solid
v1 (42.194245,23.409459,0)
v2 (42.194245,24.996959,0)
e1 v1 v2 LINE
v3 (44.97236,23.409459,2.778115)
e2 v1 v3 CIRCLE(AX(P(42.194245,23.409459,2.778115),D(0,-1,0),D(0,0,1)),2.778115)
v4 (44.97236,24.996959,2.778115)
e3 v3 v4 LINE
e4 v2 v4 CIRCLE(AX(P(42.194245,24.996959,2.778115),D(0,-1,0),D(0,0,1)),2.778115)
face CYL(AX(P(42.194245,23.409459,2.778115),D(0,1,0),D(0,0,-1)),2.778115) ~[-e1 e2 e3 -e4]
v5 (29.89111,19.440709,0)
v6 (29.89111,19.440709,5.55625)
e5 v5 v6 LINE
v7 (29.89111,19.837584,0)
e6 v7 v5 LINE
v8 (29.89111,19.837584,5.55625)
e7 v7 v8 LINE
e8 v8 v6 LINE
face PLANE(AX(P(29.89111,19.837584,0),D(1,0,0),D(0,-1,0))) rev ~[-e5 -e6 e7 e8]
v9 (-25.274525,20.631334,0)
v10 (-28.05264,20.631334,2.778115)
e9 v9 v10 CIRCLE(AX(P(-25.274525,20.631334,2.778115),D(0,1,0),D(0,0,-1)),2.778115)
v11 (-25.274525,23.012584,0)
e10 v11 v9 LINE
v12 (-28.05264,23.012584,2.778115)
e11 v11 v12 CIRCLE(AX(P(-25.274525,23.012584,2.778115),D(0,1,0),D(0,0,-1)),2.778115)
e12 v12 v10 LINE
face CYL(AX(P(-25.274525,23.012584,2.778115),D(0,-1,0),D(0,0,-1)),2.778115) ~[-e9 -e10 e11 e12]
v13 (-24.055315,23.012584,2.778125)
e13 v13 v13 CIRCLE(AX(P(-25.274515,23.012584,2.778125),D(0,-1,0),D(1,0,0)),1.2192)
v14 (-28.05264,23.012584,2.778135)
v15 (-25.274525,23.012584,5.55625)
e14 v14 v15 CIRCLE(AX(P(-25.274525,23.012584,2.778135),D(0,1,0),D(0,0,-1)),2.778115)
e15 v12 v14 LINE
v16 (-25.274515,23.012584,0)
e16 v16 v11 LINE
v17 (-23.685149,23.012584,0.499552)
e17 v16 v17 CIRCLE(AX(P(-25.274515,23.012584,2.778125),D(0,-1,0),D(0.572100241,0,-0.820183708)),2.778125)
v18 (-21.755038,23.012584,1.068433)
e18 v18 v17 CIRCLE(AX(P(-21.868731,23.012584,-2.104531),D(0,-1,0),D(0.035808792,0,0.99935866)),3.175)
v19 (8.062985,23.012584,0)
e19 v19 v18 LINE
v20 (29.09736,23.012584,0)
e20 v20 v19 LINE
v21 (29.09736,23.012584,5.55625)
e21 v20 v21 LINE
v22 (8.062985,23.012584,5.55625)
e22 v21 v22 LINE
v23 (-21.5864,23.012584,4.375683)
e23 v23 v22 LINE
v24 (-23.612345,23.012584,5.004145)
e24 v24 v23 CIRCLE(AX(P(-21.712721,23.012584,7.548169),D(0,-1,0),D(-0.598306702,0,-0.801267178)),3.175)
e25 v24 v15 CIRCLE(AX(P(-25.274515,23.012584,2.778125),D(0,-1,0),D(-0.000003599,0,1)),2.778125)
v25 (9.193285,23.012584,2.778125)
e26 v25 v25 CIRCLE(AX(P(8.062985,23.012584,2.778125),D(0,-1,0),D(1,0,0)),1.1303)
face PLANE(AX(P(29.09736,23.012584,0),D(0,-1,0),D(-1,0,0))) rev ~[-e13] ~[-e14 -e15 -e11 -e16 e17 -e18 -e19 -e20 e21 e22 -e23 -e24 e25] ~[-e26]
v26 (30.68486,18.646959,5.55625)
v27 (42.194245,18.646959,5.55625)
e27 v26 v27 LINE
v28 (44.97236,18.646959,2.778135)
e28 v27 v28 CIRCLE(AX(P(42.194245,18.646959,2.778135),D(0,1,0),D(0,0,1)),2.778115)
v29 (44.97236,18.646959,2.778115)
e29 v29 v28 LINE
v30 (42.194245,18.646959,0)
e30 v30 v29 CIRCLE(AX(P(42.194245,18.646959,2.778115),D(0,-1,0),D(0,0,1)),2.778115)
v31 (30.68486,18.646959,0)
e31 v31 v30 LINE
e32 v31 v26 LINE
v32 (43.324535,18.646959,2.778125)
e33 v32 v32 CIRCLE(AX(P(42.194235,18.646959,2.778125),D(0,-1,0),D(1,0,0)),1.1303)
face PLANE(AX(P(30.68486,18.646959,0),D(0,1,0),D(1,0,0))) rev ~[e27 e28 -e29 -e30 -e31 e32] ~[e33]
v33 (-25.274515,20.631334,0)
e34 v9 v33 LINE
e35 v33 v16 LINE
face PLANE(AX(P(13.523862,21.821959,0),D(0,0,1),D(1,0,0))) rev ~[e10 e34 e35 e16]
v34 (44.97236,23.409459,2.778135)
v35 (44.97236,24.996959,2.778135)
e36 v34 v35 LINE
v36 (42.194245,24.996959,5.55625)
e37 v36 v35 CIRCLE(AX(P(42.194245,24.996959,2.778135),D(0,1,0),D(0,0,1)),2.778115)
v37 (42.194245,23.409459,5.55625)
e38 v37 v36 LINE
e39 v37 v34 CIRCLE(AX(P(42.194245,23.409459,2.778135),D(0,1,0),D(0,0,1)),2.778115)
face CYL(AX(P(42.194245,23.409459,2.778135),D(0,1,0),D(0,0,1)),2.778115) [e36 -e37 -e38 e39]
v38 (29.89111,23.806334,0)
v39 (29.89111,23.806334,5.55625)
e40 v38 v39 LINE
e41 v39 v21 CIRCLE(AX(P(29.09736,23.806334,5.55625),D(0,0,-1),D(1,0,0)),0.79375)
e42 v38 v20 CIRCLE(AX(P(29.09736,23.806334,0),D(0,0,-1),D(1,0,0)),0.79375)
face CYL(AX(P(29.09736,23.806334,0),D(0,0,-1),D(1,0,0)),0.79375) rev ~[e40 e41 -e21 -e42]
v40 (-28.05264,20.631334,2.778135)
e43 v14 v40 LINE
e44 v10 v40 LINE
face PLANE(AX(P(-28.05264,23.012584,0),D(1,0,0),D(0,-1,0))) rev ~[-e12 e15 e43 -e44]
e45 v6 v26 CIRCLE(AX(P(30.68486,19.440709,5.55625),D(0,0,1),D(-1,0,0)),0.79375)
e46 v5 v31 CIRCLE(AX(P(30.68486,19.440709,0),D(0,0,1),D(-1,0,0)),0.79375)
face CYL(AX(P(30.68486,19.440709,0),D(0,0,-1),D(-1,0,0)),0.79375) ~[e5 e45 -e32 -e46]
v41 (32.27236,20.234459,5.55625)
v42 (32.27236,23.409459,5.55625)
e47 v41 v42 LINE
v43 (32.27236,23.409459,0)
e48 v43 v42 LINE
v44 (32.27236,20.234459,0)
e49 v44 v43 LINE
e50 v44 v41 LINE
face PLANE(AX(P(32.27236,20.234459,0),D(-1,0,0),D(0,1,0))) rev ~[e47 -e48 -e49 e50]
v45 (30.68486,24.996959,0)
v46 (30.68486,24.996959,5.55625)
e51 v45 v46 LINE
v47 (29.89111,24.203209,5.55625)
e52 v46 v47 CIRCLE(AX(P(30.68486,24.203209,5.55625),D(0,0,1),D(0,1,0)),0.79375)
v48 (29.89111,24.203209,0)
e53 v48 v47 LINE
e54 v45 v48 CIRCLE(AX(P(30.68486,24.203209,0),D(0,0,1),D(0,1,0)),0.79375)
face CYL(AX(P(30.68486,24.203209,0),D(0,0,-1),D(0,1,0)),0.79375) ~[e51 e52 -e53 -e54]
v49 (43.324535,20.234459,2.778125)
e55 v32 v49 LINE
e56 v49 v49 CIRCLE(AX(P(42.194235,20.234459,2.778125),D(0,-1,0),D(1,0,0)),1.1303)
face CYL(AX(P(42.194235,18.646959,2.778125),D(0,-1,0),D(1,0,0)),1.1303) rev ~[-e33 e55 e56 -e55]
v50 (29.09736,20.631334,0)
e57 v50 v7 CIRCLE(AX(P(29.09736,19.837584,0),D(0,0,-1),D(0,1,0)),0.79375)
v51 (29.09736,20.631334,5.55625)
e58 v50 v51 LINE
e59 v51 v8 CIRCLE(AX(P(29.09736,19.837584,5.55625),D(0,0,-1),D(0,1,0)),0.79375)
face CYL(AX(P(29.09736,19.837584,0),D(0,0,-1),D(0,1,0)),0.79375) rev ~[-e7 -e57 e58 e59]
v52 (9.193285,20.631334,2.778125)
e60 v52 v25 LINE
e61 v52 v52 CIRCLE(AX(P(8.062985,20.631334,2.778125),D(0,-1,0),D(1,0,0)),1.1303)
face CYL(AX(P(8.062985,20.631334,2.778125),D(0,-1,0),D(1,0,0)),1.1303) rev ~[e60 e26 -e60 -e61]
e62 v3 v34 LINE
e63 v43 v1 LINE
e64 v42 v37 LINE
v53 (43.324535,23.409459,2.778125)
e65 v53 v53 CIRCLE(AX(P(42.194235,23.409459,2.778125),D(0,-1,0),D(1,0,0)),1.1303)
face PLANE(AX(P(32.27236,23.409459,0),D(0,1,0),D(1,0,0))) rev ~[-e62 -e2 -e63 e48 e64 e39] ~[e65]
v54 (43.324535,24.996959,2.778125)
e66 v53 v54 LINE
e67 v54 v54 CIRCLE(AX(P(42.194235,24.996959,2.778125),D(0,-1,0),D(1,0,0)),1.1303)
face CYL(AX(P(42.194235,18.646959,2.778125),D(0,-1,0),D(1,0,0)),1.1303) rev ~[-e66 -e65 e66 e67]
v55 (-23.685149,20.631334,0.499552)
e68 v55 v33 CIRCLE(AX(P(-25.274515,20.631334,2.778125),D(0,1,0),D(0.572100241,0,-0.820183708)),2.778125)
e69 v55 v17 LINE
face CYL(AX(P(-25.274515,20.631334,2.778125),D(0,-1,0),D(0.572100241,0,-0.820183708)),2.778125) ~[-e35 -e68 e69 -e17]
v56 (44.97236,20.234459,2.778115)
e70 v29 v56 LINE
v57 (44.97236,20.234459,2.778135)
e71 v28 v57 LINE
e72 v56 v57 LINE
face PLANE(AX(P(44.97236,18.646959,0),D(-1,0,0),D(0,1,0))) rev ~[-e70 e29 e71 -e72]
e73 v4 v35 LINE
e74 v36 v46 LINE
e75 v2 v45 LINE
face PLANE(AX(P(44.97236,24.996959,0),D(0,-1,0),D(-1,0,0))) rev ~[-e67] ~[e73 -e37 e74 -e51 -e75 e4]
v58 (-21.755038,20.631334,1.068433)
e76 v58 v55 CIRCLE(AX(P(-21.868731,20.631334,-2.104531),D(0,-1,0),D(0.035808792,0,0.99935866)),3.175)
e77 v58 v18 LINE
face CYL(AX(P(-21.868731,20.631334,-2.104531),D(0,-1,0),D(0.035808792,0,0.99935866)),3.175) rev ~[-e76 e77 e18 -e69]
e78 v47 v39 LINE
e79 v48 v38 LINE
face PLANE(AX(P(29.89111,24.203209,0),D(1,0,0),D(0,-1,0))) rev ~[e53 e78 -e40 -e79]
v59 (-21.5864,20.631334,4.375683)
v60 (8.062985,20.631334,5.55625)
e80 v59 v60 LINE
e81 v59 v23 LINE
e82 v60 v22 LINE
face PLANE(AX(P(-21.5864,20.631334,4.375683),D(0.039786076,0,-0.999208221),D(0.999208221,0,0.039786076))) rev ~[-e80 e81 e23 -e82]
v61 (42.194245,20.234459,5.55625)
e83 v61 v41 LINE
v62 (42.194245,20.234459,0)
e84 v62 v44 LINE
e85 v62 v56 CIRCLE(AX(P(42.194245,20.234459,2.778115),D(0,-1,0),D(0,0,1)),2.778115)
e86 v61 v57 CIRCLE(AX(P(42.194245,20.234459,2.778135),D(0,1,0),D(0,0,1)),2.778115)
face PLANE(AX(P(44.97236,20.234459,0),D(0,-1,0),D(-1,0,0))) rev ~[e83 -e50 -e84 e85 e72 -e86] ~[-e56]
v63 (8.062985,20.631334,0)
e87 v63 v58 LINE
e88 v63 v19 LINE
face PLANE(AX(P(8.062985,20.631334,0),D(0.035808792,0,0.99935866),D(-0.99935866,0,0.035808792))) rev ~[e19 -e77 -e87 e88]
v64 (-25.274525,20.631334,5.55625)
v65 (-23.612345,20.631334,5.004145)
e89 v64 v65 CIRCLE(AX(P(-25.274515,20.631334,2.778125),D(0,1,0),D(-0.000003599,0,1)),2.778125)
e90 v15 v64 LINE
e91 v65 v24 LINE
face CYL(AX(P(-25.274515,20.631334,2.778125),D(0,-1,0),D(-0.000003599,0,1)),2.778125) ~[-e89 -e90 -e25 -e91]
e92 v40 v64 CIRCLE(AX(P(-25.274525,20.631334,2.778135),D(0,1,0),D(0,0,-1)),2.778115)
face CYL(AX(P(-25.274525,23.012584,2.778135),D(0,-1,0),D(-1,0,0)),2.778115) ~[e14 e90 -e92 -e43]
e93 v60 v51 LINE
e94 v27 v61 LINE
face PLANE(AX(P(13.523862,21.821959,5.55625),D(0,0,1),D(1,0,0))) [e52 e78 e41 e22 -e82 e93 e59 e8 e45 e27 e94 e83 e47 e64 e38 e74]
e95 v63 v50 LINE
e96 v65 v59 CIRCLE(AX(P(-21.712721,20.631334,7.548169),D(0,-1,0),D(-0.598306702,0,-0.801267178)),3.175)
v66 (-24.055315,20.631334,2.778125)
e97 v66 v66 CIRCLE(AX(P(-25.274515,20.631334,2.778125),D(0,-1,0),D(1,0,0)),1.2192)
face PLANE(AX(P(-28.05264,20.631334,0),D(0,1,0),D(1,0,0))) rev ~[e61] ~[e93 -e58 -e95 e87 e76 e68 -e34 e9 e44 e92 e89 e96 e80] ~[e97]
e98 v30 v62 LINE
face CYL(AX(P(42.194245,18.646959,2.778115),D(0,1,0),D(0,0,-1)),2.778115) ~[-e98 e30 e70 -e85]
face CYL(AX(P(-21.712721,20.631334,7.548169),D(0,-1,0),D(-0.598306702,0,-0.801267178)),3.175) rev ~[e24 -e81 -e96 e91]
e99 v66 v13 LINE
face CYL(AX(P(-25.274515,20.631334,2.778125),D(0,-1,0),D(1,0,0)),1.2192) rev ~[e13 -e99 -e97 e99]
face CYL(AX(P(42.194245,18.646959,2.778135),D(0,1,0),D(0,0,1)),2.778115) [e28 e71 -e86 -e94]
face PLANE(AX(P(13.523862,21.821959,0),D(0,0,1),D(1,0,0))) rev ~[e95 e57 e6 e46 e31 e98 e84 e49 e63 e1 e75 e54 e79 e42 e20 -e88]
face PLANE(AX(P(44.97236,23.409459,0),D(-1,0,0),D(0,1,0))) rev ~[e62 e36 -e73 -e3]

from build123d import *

# Parameters (mm, degrees)
F1_DEPTH = 5.55625
F2_R     = 1.2192
F3_DEPTH = 25.4
F4_R     = 1.1303
F5_DEPTH = 25.4
F6_R     = 2.778115
F7_R     = 2.778115
F8_R     = 1.1303
F9_DEPTH = 25.4


# Not quite as in the source:
# - a fillet or chamfer is up to 0.001 mm smaller than in the source, because OpenCascade refuses the exact size
# - ends of sketch curves that miss each other by under 0.0002 mm in the source are joined


with BuildPart() as f1:
    # F0 (on Top) → F1 (new body)
    with BuildSketch(Plane.XY):
        with BuildLine():
            Line((29.0973595662, 23.0125838354), (-28.0526404338, 23.0125838354))
            Line((-28.0526404338, 23.0125838354), (-28.0526404338, 20.6313338354))
            Line((-28.0526404338, 20.6313338354), (29.0973595662, 20.6313338354))
            ThreePointArc((29.0973595662, 20.6313338354), (29.6586255738, 20.398849843), (29.8911095662, 19.8375838354))
            Line((29.8911095662, 19.8375838354), (29.8911095662, 19.4407088354))
            ThreePointArc((29.8911095662, 19.4407088354), (30.1235935587, 18.8794428278), (30.6848595662, 18.6469588354))
            Line((30.6848595662, 18.6469588354), (44.9723595662, 18.6469588354))
            Line((44.9723595662, 18.6469588354), (44.9723595662, 20.2344588354))
            Line((44.9723595662, 20.2344588354), (32.2723595662, 20.2344588354))
            Line((32.2723595662, 20.2344588354), (32.2723595662, 23.4094588354))
            Line((32.2723595662, 23.4094588354), (44.9723595662, 23.4094588354))
            Line((44.9723595662, 23.4094588354), (44.9723595662, 24.9969588354))
            Line((44.9723595662, 24.9969588354), (30.6848595662, 24.9969588354))
            ThreePointArc((30.6848595662, 24.9969588354), (30.1235935587, 24.764474843), (29.8911095662, 24.2032088354))
            Line((29.8911095662, 24.2032088354), (29.8911095662, 23.8063338354))
            ThreePointArc((29.8911095662, 23.8063338354), (29.6586255738, 23.2450678278), (29.0973595662, 23.0125838354))
        make_face()
    extrude(amount=F1_DEPTH)

    # F2 (on face) → F3 (cut)
    with BuildSketch(Plane.XZ.offset(-20.6313338354)):
        with Locations((-25.2745154338, 2.778125)):
            Circle(F2_R)
    extrude(amount=-F3_DEPTH, mode=Mode.SUBTRACT)

    # F4 (on face) → F5 (cut)
    with BuildSketch(Plane.XZ.offset(-18.6469588354)):
        with Locations((42.1942345662, 2.778125)):
            Circle(F4_R)
    extrude(amount=-F5_DEPTH, mode=Mode.SUBTRACT)

    # F6 (radius 2.778125 in the source; OpenCascade refuses exactly that, so slightly less here)
    f6_edges = [f1.edges().sort_by_distance(p)[0] for p in [
        (44.97236, 19.440709, 5.55625),
        (44.97236, 19.440709, 0),
        (44.97236, 24.203209, 0),
        (44.97236, 24.203209, 5.55625),
    ]]
    fillet(f6_edges, radius=F6_R)

    # F7 (radius 2.778125 in the source; OpenCascade refuses exactly that, so slightly less here)
    f7_edges = [f1.edges().sort_by_distance(p)[0] for p in [
        (-28.05264, 21.821959, 5.55625),
        (-28.05264, 21.821959, 0),
    ]]
    fillet(f7_edges, radius=F7_R)

    # F8 (on face) → F9 (cut)
    with BuildSketch(Plane.XZ.offset(-20.6313338354)):
        with Locations((8.0629845662, 2.778125)):
            Circle(F8_R)
        with BuildLine():
            Line((8.0629845662, 5.55625), (-25.2745254338, 5.55625))
            ThreePointArc((-25.2745254338, 5.55625), (-24.3987826977, 5.4146133255), (-23.612344628, 5.0041453791))
            ThreePointArc((-23.612344628, 5.0041453791), (-22.6534079634, 4.515722008), (-21.5864000573, 4.375682569))
            Line((-21.5864000573, 4.375682569), (8.0629845662, 5.55625))
        make_face()
        with BuildLine():
            ThreePointArc((-23.6851494527, 0.4995521366), (-24.4415033451, 0.1278289079), (-25.2745154338, 0))
            Line((-25.2745154338, 0), (8.0629845662, 0))
            Line((8.0629845662, 0), (-21.7550382738, 1.0684326083))
            ThreePointArc((-21.7550382738, 1.0684326083), (-22.7663528525, 0.9409409702), (-23.6851494527, 0.4995521366))
        make_face()
    extrude(amount=-F9_DEPTH, mode=Mode.SUBTRACT)


solid = f1.part
